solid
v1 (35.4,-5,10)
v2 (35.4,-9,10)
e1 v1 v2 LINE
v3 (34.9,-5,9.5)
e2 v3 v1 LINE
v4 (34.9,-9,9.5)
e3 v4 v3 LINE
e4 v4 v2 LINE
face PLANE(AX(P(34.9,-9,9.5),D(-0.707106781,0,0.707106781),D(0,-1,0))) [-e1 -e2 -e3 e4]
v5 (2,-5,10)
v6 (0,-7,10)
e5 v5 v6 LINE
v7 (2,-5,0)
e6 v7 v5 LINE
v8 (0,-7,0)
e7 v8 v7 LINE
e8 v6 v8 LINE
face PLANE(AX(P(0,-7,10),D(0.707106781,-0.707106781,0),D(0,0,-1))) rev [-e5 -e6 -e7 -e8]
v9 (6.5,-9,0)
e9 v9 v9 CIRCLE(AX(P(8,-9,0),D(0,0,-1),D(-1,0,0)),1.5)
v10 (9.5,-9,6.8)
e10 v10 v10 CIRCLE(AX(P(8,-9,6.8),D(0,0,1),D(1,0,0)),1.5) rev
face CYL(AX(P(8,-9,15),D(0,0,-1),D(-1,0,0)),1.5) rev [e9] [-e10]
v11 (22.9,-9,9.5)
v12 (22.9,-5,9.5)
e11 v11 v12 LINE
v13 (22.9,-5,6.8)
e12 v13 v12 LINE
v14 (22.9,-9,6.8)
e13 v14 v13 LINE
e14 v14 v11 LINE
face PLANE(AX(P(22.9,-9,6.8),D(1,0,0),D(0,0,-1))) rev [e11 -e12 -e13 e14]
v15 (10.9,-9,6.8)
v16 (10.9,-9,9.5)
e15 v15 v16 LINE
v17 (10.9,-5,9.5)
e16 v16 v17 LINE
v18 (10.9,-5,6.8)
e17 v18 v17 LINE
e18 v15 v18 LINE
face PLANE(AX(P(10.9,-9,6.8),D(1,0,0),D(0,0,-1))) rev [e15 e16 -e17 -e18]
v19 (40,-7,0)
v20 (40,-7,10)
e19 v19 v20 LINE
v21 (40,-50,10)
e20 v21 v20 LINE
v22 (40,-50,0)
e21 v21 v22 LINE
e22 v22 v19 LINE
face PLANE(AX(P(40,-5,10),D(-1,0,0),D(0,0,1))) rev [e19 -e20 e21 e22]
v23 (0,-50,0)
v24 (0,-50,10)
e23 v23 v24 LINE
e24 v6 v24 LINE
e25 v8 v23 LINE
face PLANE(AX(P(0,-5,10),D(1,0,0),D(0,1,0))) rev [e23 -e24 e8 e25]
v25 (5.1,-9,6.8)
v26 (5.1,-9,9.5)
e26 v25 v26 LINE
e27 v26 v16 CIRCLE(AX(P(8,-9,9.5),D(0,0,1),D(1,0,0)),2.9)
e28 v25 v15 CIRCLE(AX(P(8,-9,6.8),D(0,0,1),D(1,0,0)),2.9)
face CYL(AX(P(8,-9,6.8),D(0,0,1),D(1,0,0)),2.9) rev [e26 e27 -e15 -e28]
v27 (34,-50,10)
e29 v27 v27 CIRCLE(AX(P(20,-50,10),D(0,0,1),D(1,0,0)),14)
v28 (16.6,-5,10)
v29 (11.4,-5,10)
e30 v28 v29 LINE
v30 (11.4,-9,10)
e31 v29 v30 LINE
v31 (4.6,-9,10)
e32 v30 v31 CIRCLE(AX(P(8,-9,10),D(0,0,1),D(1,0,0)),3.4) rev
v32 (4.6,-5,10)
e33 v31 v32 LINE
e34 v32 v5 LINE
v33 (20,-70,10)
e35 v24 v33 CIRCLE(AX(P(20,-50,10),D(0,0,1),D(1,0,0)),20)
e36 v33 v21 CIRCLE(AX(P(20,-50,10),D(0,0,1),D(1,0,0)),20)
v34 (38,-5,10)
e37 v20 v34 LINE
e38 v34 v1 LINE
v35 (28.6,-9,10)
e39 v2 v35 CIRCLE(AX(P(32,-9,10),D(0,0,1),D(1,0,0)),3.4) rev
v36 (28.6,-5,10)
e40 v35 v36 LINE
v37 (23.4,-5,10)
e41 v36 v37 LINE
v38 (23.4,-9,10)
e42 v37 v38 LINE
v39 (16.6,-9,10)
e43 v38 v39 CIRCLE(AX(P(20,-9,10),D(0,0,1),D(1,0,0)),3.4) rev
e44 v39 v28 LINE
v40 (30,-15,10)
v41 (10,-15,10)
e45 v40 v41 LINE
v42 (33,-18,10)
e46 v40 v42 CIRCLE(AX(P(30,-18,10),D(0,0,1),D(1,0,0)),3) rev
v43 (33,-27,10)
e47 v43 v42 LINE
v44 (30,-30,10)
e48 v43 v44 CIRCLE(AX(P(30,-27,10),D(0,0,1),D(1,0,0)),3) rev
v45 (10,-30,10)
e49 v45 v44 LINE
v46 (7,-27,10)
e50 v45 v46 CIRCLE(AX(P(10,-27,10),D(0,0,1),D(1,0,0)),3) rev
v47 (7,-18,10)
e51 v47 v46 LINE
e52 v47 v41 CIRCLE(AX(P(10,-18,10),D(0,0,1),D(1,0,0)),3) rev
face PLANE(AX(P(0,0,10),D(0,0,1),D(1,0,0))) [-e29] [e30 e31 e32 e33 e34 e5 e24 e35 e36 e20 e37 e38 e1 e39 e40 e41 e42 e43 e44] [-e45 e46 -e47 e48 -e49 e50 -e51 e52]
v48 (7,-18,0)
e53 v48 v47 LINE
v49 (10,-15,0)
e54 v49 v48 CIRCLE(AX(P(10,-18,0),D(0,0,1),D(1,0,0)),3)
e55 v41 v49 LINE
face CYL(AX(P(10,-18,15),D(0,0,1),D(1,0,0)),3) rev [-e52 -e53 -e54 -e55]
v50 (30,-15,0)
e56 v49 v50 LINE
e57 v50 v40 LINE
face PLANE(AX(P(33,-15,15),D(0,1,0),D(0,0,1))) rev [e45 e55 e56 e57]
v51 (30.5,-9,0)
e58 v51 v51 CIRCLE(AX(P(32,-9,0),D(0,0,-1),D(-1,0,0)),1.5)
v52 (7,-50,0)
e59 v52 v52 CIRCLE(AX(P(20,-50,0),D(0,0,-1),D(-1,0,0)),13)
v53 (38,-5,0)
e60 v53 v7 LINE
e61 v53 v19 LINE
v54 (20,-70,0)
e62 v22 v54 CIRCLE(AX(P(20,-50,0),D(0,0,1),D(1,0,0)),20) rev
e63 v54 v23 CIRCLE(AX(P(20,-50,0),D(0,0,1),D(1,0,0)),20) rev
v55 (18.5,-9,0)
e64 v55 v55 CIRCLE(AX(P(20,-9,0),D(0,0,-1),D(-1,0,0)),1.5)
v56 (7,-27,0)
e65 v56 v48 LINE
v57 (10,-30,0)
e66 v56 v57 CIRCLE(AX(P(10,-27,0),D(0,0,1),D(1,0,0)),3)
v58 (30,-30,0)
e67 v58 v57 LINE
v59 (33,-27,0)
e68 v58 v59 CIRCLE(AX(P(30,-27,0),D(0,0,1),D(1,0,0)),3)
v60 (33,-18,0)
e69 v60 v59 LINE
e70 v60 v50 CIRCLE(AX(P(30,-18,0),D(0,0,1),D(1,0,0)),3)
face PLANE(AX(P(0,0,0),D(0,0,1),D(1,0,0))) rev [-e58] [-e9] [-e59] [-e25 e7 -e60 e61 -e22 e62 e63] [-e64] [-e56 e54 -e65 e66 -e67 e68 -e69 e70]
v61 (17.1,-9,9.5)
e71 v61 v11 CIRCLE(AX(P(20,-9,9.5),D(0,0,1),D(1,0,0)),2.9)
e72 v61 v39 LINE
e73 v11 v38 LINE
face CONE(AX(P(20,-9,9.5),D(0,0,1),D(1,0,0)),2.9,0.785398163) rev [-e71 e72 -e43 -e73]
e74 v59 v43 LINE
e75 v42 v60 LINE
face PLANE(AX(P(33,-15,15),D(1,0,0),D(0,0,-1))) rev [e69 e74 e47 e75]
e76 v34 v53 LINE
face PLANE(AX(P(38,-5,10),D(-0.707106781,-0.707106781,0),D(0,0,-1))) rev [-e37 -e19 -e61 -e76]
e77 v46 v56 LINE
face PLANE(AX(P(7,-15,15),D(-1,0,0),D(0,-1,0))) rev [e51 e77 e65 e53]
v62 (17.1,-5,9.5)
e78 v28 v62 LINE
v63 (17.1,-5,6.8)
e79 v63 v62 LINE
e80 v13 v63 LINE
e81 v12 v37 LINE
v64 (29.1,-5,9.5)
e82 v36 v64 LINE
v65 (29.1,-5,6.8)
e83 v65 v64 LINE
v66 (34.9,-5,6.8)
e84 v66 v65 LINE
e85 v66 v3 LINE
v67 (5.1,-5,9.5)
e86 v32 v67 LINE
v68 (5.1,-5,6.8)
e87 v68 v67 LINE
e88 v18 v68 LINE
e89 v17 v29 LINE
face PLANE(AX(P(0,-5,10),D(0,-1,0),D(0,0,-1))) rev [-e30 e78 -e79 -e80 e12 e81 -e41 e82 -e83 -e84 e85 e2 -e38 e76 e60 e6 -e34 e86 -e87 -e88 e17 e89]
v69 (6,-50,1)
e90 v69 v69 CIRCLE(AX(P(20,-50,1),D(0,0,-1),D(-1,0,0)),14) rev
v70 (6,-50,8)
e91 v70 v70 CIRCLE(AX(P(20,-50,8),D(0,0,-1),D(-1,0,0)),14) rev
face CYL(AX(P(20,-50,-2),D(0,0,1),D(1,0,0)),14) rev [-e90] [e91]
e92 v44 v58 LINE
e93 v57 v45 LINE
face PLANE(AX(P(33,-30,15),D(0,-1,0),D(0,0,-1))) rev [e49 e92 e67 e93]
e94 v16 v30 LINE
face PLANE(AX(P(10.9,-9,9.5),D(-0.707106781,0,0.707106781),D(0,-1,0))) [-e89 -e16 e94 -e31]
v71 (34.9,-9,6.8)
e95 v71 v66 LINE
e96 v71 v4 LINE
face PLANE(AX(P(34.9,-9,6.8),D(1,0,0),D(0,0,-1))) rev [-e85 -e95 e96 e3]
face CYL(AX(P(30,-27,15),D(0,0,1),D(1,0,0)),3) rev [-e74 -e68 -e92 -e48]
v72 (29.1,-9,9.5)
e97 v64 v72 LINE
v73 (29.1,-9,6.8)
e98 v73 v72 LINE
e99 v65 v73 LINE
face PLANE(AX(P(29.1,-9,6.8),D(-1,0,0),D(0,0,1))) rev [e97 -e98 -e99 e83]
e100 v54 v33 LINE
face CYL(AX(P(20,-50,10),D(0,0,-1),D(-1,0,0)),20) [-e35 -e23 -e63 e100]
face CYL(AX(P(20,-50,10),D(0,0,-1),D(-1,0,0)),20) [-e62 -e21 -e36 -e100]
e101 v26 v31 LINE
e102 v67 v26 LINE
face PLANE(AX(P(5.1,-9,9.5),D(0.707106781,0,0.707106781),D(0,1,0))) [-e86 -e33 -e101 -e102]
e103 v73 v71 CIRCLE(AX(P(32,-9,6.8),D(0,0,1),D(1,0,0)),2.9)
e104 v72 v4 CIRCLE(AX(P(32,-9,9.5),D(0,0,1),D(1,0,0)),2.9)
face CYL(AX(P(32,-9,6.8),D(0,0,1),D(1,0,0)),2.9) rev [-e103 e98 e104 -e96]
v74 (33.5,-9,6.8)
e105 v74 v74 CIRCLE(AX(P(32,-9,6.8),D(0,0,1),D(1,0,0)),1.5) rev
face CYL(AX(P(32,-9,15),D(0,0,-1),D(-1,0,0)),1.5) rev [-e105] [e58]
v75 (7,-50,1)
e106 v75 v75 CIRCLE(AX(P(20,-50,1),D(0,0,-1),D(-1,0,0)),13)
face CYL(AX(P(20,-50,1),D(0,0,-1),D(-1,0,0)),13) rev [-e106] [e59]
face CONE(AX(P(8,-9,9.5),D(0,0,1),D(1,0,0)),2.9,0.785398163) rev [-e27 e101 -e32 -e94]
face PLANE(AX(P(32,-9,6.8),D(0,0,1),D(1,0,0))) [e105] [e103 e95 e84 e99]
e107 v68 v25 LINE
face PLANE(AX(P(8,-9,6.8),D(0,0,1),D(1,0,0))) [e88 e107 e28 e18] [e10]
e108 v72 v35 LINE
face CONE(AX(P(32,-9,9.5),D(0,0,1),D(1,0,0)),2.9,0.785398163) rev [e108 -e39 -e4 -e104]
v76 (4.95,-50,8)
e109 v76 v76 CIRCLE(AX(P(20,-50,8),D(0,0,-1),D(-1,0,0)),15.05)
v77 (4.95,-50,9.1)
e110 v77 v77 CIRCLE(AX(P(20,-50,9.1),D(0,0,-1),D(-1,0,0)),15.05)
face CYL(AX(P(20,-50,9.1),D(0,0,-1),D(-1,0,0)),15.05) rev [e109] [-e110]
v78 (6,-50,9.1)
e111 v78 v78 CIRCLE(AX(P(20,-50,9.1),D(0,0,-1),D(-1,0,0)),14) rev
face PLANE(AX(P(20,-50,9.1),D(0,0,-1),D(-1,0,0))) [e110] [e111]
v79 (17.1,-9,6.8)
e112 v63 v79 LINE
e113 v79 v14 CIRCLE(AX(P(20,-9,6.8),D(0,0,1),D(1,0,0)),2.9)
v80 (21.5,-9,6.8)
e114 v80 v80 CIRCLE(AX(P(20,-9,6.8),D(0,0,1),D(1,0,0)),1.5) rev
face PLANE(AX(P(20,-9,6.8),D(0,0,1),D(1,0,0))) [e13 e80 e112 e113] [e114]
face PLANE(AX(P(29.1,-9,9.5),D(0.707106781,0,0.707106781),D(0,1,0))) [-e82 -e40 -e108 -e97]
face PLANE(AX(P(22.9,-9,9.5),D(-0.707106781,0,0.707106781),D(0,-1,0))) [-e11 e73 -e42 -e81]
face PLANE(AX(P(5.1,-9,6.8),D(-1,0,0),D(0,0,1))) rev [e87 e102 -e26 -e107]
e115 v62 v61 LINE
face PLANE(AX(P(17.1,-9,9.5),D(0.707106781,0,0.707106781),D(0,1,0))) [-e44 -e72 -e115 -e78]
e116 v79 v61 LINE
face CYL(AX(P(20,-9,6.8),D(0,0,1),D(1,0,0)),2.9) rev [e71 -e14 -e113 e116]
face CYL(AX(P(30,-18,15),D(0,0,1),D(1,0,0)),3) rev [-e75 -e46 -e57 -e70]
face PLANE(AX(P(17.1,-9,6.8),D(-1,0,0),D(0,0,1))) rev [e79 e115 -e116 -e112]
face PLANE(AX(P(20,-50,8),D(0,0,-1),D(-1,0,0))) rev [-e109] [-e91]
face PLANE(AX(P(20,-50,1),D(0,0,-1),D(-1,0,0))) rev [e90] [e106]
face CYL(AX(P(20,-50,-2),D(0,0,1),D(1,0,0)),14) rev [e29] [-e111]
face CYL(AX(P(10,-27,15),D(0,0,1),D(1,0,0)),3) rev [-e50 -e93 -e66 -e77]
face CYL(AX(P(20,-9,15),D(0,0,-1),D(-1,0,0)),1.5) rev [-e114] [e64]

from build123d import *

# Parameters (mm, degrees)
SKETCH_1_W          = 40
SKETCH_1_H          = 65
EXTRUDE_1_DEPTH     = 10
SKETCH_2_R          = 14
CUT_EXTRUDE_1_DEPTH = 12
SKETCH_3_R          = 15.05
CUT_EXTRUDE_2_DEPTH = 1.1
CHAMFER_1_SIZE      = 2
FILLET_1_R          = 20
SKETCH_4_R          = 1.5
CUT_EXTRUDE_3_DEPTH = 15
SKETCH_5_W          = 26
SKETCH_5_H          = 15
CUT_EXTRUDE_4_DEPTH = 15
FILLET_2_R          = 3
EXTRUDE_START       = -1
SKETCH_7_R          = 14
SKETCH_7_R_2        = 13
EXTRUDE_2_DEPTH     = 1
CUT_EXTRUDE_5_DEPTH = 3.2
CHAMFER_2_SIZE      = 0.5


with BuildPart() as part:
    # 草图1 → 凸台-拉伸1 (new body)
    with BuildSketch(Plane.XY):
        with Locations((20, -37.5)):
            Rectangle(SKETCH_1_W, SKETCH_1_H)
    extrude(amount=EXTRUDE_1_DEPTH)

    # 草图2 → 切除-拉伸1 (cut)
    with BuildSketch(Plane.XY.offset(10)):
        with Locations((20, -50)):
            Circle(SKETCH_2_R)
    extrude(amount=-CUT_EXTRUDE_1_DEPTH, mode=Mode.SUBTRACT)

    # 草图3 → 切除-拉伸2 (cut)
    with BuildSketch(Plane(origin=(0, 0, 8), x_dir=(-1, 0, 0), z_dir=(0, 0, -1))):
        with Locations((-20, -50)):
            Circle(SKETCH_3_R)
    extrude(amount=-CUT_EXTRUDE_2_DEPTH, mode=Mode.SUBTRACT)

    # 倒角1
    chamfer_1_edges = [part.edges().sort_by_distance(p)[0] for p in [
        (0, -5, 5),
        (40, -5, 5),
    ]]
    chamfer(chamfer_1_edges, length=CHAMFER_1_SIZE)

    # 圆角1
    fillet_1_edges = [part.edges().sort_by_distance(p)[0] for p in [
        (0, -70, 5),
        (40, -70, 5),
    ]]
    fillet(fillet_1_edges, radius=FILLET_1_R - 0.0001)  # a hair under: the kernel refuses the full size

    # 草图4 → 切除-拉伸3 (cut)
    with BuildSketch(Plane(origin=(0, 0, 0), x_dir=(-1, 0, 0), z_dir=(0, 0, -1))):
        with Locations((-32, -9)):
            Circle(SKETCH_4_R)
        with Locations((-20, -9)):
            Circle(SKETCH_4_R)
        with Locations((-8, -9)):
            Circle(SKETCH_4_R)
    extrude(amount=-CUT_EXTRUDE_3_DEPTH, mode=Mode.SUBTRACT)

    # 草图5 → 切除-拉伸4 (cut)
    with BuildSketch(Plane(origin=(0, 0, 0), x_dir=(-1, 0, 0), z_dir=(0, 0, -1))):
        with Locations((-20, -22.5)):
            Rectangle(SKETCH_5_W, SKETCH_5_H)
    extrude(amount=-CUT_EXTRUDE_4_DEPTH, mode=Mode.SUBTRACT)

    # 圆角2
    fillet_2_edges = [part.edges().sort_by_distance(p)[0] for p in [
        (7, -15, 5),
        (7, -30, 5),
        (33, -30, 5),
        (33, -15, 5),
    ]]
    fillet(fillet_2_edges, radius=FILLET_2_R)

    # 草图7 → 凸台-拉伸2 (add)
    with BuildSketch(Plane(origin=(0, 0, 0), x_dir=(-1, 0, 0), z_dir=(0, 0, -1)).offset(EXTRUDE_START)):
        with Locations((-20, -50)):
            Circle(SKETCH_7_R)
        with Locations((-20, -50)):
            Circle(SKETCH_7_R_2, mode=Mode.SUBTRACT)
    extrude(amount=EXTRUDE_2_DEPTH)

    # 草图8 → 切除-拉伸5 (cut)
    with BuildSketch(Plane.XY.offset(10)):
        with BuildLine():
            Line((5.1, -9), (5.1, -5))
            Line((5.1, -5), (10.9, -5))
            Line((10.9, -5), (10.9, -9))
            ThreePointArc((10.9, -9), (8, -11.9), (5.1, -9))
        make_face()
        with BuildLine():
            Line((17.1, -9), (17.1, -5))
            Line((17.1, -5), (22.9, -5))
            Line((22.9, -5), (22.9, -9))
            ThreePointArc((22.9, -9), (20, -11.9), (17.1, -9))
        make_face()
        with BuildLine():
            Line((34.9, -9), (34.9, -5))
            Line((34.9, -5), (29.1, -5))
            Line((29.1, -5), (29.1, -9))
            ThreePointArc((29.1, -9), (32, -11.9), (34.9, -9))
        make_face()
    extrude(amount=-CUT_EXTRUDE_5_DEPTH, mode=Mode.SUBTRACT)

    # 倒角2
    chamfer_2_edges = [part.edges().sort_by_distance(p)[0] for p in [
        (8, -11.9, 10),
        (10.9, -7, 10),
        (5.1, -7, 10),
        (32, -11.9, 10),
        (34.9, -7, 10),
        (29.1, -7, 10),
        (20, -11.9, 10),
        (22.9, -7, 10),
        (17.1, -7, 10),
    ]]
    chamfer(chamfer_2_edges, length=CHAMFER_2_SIZE)


solid = part.part
